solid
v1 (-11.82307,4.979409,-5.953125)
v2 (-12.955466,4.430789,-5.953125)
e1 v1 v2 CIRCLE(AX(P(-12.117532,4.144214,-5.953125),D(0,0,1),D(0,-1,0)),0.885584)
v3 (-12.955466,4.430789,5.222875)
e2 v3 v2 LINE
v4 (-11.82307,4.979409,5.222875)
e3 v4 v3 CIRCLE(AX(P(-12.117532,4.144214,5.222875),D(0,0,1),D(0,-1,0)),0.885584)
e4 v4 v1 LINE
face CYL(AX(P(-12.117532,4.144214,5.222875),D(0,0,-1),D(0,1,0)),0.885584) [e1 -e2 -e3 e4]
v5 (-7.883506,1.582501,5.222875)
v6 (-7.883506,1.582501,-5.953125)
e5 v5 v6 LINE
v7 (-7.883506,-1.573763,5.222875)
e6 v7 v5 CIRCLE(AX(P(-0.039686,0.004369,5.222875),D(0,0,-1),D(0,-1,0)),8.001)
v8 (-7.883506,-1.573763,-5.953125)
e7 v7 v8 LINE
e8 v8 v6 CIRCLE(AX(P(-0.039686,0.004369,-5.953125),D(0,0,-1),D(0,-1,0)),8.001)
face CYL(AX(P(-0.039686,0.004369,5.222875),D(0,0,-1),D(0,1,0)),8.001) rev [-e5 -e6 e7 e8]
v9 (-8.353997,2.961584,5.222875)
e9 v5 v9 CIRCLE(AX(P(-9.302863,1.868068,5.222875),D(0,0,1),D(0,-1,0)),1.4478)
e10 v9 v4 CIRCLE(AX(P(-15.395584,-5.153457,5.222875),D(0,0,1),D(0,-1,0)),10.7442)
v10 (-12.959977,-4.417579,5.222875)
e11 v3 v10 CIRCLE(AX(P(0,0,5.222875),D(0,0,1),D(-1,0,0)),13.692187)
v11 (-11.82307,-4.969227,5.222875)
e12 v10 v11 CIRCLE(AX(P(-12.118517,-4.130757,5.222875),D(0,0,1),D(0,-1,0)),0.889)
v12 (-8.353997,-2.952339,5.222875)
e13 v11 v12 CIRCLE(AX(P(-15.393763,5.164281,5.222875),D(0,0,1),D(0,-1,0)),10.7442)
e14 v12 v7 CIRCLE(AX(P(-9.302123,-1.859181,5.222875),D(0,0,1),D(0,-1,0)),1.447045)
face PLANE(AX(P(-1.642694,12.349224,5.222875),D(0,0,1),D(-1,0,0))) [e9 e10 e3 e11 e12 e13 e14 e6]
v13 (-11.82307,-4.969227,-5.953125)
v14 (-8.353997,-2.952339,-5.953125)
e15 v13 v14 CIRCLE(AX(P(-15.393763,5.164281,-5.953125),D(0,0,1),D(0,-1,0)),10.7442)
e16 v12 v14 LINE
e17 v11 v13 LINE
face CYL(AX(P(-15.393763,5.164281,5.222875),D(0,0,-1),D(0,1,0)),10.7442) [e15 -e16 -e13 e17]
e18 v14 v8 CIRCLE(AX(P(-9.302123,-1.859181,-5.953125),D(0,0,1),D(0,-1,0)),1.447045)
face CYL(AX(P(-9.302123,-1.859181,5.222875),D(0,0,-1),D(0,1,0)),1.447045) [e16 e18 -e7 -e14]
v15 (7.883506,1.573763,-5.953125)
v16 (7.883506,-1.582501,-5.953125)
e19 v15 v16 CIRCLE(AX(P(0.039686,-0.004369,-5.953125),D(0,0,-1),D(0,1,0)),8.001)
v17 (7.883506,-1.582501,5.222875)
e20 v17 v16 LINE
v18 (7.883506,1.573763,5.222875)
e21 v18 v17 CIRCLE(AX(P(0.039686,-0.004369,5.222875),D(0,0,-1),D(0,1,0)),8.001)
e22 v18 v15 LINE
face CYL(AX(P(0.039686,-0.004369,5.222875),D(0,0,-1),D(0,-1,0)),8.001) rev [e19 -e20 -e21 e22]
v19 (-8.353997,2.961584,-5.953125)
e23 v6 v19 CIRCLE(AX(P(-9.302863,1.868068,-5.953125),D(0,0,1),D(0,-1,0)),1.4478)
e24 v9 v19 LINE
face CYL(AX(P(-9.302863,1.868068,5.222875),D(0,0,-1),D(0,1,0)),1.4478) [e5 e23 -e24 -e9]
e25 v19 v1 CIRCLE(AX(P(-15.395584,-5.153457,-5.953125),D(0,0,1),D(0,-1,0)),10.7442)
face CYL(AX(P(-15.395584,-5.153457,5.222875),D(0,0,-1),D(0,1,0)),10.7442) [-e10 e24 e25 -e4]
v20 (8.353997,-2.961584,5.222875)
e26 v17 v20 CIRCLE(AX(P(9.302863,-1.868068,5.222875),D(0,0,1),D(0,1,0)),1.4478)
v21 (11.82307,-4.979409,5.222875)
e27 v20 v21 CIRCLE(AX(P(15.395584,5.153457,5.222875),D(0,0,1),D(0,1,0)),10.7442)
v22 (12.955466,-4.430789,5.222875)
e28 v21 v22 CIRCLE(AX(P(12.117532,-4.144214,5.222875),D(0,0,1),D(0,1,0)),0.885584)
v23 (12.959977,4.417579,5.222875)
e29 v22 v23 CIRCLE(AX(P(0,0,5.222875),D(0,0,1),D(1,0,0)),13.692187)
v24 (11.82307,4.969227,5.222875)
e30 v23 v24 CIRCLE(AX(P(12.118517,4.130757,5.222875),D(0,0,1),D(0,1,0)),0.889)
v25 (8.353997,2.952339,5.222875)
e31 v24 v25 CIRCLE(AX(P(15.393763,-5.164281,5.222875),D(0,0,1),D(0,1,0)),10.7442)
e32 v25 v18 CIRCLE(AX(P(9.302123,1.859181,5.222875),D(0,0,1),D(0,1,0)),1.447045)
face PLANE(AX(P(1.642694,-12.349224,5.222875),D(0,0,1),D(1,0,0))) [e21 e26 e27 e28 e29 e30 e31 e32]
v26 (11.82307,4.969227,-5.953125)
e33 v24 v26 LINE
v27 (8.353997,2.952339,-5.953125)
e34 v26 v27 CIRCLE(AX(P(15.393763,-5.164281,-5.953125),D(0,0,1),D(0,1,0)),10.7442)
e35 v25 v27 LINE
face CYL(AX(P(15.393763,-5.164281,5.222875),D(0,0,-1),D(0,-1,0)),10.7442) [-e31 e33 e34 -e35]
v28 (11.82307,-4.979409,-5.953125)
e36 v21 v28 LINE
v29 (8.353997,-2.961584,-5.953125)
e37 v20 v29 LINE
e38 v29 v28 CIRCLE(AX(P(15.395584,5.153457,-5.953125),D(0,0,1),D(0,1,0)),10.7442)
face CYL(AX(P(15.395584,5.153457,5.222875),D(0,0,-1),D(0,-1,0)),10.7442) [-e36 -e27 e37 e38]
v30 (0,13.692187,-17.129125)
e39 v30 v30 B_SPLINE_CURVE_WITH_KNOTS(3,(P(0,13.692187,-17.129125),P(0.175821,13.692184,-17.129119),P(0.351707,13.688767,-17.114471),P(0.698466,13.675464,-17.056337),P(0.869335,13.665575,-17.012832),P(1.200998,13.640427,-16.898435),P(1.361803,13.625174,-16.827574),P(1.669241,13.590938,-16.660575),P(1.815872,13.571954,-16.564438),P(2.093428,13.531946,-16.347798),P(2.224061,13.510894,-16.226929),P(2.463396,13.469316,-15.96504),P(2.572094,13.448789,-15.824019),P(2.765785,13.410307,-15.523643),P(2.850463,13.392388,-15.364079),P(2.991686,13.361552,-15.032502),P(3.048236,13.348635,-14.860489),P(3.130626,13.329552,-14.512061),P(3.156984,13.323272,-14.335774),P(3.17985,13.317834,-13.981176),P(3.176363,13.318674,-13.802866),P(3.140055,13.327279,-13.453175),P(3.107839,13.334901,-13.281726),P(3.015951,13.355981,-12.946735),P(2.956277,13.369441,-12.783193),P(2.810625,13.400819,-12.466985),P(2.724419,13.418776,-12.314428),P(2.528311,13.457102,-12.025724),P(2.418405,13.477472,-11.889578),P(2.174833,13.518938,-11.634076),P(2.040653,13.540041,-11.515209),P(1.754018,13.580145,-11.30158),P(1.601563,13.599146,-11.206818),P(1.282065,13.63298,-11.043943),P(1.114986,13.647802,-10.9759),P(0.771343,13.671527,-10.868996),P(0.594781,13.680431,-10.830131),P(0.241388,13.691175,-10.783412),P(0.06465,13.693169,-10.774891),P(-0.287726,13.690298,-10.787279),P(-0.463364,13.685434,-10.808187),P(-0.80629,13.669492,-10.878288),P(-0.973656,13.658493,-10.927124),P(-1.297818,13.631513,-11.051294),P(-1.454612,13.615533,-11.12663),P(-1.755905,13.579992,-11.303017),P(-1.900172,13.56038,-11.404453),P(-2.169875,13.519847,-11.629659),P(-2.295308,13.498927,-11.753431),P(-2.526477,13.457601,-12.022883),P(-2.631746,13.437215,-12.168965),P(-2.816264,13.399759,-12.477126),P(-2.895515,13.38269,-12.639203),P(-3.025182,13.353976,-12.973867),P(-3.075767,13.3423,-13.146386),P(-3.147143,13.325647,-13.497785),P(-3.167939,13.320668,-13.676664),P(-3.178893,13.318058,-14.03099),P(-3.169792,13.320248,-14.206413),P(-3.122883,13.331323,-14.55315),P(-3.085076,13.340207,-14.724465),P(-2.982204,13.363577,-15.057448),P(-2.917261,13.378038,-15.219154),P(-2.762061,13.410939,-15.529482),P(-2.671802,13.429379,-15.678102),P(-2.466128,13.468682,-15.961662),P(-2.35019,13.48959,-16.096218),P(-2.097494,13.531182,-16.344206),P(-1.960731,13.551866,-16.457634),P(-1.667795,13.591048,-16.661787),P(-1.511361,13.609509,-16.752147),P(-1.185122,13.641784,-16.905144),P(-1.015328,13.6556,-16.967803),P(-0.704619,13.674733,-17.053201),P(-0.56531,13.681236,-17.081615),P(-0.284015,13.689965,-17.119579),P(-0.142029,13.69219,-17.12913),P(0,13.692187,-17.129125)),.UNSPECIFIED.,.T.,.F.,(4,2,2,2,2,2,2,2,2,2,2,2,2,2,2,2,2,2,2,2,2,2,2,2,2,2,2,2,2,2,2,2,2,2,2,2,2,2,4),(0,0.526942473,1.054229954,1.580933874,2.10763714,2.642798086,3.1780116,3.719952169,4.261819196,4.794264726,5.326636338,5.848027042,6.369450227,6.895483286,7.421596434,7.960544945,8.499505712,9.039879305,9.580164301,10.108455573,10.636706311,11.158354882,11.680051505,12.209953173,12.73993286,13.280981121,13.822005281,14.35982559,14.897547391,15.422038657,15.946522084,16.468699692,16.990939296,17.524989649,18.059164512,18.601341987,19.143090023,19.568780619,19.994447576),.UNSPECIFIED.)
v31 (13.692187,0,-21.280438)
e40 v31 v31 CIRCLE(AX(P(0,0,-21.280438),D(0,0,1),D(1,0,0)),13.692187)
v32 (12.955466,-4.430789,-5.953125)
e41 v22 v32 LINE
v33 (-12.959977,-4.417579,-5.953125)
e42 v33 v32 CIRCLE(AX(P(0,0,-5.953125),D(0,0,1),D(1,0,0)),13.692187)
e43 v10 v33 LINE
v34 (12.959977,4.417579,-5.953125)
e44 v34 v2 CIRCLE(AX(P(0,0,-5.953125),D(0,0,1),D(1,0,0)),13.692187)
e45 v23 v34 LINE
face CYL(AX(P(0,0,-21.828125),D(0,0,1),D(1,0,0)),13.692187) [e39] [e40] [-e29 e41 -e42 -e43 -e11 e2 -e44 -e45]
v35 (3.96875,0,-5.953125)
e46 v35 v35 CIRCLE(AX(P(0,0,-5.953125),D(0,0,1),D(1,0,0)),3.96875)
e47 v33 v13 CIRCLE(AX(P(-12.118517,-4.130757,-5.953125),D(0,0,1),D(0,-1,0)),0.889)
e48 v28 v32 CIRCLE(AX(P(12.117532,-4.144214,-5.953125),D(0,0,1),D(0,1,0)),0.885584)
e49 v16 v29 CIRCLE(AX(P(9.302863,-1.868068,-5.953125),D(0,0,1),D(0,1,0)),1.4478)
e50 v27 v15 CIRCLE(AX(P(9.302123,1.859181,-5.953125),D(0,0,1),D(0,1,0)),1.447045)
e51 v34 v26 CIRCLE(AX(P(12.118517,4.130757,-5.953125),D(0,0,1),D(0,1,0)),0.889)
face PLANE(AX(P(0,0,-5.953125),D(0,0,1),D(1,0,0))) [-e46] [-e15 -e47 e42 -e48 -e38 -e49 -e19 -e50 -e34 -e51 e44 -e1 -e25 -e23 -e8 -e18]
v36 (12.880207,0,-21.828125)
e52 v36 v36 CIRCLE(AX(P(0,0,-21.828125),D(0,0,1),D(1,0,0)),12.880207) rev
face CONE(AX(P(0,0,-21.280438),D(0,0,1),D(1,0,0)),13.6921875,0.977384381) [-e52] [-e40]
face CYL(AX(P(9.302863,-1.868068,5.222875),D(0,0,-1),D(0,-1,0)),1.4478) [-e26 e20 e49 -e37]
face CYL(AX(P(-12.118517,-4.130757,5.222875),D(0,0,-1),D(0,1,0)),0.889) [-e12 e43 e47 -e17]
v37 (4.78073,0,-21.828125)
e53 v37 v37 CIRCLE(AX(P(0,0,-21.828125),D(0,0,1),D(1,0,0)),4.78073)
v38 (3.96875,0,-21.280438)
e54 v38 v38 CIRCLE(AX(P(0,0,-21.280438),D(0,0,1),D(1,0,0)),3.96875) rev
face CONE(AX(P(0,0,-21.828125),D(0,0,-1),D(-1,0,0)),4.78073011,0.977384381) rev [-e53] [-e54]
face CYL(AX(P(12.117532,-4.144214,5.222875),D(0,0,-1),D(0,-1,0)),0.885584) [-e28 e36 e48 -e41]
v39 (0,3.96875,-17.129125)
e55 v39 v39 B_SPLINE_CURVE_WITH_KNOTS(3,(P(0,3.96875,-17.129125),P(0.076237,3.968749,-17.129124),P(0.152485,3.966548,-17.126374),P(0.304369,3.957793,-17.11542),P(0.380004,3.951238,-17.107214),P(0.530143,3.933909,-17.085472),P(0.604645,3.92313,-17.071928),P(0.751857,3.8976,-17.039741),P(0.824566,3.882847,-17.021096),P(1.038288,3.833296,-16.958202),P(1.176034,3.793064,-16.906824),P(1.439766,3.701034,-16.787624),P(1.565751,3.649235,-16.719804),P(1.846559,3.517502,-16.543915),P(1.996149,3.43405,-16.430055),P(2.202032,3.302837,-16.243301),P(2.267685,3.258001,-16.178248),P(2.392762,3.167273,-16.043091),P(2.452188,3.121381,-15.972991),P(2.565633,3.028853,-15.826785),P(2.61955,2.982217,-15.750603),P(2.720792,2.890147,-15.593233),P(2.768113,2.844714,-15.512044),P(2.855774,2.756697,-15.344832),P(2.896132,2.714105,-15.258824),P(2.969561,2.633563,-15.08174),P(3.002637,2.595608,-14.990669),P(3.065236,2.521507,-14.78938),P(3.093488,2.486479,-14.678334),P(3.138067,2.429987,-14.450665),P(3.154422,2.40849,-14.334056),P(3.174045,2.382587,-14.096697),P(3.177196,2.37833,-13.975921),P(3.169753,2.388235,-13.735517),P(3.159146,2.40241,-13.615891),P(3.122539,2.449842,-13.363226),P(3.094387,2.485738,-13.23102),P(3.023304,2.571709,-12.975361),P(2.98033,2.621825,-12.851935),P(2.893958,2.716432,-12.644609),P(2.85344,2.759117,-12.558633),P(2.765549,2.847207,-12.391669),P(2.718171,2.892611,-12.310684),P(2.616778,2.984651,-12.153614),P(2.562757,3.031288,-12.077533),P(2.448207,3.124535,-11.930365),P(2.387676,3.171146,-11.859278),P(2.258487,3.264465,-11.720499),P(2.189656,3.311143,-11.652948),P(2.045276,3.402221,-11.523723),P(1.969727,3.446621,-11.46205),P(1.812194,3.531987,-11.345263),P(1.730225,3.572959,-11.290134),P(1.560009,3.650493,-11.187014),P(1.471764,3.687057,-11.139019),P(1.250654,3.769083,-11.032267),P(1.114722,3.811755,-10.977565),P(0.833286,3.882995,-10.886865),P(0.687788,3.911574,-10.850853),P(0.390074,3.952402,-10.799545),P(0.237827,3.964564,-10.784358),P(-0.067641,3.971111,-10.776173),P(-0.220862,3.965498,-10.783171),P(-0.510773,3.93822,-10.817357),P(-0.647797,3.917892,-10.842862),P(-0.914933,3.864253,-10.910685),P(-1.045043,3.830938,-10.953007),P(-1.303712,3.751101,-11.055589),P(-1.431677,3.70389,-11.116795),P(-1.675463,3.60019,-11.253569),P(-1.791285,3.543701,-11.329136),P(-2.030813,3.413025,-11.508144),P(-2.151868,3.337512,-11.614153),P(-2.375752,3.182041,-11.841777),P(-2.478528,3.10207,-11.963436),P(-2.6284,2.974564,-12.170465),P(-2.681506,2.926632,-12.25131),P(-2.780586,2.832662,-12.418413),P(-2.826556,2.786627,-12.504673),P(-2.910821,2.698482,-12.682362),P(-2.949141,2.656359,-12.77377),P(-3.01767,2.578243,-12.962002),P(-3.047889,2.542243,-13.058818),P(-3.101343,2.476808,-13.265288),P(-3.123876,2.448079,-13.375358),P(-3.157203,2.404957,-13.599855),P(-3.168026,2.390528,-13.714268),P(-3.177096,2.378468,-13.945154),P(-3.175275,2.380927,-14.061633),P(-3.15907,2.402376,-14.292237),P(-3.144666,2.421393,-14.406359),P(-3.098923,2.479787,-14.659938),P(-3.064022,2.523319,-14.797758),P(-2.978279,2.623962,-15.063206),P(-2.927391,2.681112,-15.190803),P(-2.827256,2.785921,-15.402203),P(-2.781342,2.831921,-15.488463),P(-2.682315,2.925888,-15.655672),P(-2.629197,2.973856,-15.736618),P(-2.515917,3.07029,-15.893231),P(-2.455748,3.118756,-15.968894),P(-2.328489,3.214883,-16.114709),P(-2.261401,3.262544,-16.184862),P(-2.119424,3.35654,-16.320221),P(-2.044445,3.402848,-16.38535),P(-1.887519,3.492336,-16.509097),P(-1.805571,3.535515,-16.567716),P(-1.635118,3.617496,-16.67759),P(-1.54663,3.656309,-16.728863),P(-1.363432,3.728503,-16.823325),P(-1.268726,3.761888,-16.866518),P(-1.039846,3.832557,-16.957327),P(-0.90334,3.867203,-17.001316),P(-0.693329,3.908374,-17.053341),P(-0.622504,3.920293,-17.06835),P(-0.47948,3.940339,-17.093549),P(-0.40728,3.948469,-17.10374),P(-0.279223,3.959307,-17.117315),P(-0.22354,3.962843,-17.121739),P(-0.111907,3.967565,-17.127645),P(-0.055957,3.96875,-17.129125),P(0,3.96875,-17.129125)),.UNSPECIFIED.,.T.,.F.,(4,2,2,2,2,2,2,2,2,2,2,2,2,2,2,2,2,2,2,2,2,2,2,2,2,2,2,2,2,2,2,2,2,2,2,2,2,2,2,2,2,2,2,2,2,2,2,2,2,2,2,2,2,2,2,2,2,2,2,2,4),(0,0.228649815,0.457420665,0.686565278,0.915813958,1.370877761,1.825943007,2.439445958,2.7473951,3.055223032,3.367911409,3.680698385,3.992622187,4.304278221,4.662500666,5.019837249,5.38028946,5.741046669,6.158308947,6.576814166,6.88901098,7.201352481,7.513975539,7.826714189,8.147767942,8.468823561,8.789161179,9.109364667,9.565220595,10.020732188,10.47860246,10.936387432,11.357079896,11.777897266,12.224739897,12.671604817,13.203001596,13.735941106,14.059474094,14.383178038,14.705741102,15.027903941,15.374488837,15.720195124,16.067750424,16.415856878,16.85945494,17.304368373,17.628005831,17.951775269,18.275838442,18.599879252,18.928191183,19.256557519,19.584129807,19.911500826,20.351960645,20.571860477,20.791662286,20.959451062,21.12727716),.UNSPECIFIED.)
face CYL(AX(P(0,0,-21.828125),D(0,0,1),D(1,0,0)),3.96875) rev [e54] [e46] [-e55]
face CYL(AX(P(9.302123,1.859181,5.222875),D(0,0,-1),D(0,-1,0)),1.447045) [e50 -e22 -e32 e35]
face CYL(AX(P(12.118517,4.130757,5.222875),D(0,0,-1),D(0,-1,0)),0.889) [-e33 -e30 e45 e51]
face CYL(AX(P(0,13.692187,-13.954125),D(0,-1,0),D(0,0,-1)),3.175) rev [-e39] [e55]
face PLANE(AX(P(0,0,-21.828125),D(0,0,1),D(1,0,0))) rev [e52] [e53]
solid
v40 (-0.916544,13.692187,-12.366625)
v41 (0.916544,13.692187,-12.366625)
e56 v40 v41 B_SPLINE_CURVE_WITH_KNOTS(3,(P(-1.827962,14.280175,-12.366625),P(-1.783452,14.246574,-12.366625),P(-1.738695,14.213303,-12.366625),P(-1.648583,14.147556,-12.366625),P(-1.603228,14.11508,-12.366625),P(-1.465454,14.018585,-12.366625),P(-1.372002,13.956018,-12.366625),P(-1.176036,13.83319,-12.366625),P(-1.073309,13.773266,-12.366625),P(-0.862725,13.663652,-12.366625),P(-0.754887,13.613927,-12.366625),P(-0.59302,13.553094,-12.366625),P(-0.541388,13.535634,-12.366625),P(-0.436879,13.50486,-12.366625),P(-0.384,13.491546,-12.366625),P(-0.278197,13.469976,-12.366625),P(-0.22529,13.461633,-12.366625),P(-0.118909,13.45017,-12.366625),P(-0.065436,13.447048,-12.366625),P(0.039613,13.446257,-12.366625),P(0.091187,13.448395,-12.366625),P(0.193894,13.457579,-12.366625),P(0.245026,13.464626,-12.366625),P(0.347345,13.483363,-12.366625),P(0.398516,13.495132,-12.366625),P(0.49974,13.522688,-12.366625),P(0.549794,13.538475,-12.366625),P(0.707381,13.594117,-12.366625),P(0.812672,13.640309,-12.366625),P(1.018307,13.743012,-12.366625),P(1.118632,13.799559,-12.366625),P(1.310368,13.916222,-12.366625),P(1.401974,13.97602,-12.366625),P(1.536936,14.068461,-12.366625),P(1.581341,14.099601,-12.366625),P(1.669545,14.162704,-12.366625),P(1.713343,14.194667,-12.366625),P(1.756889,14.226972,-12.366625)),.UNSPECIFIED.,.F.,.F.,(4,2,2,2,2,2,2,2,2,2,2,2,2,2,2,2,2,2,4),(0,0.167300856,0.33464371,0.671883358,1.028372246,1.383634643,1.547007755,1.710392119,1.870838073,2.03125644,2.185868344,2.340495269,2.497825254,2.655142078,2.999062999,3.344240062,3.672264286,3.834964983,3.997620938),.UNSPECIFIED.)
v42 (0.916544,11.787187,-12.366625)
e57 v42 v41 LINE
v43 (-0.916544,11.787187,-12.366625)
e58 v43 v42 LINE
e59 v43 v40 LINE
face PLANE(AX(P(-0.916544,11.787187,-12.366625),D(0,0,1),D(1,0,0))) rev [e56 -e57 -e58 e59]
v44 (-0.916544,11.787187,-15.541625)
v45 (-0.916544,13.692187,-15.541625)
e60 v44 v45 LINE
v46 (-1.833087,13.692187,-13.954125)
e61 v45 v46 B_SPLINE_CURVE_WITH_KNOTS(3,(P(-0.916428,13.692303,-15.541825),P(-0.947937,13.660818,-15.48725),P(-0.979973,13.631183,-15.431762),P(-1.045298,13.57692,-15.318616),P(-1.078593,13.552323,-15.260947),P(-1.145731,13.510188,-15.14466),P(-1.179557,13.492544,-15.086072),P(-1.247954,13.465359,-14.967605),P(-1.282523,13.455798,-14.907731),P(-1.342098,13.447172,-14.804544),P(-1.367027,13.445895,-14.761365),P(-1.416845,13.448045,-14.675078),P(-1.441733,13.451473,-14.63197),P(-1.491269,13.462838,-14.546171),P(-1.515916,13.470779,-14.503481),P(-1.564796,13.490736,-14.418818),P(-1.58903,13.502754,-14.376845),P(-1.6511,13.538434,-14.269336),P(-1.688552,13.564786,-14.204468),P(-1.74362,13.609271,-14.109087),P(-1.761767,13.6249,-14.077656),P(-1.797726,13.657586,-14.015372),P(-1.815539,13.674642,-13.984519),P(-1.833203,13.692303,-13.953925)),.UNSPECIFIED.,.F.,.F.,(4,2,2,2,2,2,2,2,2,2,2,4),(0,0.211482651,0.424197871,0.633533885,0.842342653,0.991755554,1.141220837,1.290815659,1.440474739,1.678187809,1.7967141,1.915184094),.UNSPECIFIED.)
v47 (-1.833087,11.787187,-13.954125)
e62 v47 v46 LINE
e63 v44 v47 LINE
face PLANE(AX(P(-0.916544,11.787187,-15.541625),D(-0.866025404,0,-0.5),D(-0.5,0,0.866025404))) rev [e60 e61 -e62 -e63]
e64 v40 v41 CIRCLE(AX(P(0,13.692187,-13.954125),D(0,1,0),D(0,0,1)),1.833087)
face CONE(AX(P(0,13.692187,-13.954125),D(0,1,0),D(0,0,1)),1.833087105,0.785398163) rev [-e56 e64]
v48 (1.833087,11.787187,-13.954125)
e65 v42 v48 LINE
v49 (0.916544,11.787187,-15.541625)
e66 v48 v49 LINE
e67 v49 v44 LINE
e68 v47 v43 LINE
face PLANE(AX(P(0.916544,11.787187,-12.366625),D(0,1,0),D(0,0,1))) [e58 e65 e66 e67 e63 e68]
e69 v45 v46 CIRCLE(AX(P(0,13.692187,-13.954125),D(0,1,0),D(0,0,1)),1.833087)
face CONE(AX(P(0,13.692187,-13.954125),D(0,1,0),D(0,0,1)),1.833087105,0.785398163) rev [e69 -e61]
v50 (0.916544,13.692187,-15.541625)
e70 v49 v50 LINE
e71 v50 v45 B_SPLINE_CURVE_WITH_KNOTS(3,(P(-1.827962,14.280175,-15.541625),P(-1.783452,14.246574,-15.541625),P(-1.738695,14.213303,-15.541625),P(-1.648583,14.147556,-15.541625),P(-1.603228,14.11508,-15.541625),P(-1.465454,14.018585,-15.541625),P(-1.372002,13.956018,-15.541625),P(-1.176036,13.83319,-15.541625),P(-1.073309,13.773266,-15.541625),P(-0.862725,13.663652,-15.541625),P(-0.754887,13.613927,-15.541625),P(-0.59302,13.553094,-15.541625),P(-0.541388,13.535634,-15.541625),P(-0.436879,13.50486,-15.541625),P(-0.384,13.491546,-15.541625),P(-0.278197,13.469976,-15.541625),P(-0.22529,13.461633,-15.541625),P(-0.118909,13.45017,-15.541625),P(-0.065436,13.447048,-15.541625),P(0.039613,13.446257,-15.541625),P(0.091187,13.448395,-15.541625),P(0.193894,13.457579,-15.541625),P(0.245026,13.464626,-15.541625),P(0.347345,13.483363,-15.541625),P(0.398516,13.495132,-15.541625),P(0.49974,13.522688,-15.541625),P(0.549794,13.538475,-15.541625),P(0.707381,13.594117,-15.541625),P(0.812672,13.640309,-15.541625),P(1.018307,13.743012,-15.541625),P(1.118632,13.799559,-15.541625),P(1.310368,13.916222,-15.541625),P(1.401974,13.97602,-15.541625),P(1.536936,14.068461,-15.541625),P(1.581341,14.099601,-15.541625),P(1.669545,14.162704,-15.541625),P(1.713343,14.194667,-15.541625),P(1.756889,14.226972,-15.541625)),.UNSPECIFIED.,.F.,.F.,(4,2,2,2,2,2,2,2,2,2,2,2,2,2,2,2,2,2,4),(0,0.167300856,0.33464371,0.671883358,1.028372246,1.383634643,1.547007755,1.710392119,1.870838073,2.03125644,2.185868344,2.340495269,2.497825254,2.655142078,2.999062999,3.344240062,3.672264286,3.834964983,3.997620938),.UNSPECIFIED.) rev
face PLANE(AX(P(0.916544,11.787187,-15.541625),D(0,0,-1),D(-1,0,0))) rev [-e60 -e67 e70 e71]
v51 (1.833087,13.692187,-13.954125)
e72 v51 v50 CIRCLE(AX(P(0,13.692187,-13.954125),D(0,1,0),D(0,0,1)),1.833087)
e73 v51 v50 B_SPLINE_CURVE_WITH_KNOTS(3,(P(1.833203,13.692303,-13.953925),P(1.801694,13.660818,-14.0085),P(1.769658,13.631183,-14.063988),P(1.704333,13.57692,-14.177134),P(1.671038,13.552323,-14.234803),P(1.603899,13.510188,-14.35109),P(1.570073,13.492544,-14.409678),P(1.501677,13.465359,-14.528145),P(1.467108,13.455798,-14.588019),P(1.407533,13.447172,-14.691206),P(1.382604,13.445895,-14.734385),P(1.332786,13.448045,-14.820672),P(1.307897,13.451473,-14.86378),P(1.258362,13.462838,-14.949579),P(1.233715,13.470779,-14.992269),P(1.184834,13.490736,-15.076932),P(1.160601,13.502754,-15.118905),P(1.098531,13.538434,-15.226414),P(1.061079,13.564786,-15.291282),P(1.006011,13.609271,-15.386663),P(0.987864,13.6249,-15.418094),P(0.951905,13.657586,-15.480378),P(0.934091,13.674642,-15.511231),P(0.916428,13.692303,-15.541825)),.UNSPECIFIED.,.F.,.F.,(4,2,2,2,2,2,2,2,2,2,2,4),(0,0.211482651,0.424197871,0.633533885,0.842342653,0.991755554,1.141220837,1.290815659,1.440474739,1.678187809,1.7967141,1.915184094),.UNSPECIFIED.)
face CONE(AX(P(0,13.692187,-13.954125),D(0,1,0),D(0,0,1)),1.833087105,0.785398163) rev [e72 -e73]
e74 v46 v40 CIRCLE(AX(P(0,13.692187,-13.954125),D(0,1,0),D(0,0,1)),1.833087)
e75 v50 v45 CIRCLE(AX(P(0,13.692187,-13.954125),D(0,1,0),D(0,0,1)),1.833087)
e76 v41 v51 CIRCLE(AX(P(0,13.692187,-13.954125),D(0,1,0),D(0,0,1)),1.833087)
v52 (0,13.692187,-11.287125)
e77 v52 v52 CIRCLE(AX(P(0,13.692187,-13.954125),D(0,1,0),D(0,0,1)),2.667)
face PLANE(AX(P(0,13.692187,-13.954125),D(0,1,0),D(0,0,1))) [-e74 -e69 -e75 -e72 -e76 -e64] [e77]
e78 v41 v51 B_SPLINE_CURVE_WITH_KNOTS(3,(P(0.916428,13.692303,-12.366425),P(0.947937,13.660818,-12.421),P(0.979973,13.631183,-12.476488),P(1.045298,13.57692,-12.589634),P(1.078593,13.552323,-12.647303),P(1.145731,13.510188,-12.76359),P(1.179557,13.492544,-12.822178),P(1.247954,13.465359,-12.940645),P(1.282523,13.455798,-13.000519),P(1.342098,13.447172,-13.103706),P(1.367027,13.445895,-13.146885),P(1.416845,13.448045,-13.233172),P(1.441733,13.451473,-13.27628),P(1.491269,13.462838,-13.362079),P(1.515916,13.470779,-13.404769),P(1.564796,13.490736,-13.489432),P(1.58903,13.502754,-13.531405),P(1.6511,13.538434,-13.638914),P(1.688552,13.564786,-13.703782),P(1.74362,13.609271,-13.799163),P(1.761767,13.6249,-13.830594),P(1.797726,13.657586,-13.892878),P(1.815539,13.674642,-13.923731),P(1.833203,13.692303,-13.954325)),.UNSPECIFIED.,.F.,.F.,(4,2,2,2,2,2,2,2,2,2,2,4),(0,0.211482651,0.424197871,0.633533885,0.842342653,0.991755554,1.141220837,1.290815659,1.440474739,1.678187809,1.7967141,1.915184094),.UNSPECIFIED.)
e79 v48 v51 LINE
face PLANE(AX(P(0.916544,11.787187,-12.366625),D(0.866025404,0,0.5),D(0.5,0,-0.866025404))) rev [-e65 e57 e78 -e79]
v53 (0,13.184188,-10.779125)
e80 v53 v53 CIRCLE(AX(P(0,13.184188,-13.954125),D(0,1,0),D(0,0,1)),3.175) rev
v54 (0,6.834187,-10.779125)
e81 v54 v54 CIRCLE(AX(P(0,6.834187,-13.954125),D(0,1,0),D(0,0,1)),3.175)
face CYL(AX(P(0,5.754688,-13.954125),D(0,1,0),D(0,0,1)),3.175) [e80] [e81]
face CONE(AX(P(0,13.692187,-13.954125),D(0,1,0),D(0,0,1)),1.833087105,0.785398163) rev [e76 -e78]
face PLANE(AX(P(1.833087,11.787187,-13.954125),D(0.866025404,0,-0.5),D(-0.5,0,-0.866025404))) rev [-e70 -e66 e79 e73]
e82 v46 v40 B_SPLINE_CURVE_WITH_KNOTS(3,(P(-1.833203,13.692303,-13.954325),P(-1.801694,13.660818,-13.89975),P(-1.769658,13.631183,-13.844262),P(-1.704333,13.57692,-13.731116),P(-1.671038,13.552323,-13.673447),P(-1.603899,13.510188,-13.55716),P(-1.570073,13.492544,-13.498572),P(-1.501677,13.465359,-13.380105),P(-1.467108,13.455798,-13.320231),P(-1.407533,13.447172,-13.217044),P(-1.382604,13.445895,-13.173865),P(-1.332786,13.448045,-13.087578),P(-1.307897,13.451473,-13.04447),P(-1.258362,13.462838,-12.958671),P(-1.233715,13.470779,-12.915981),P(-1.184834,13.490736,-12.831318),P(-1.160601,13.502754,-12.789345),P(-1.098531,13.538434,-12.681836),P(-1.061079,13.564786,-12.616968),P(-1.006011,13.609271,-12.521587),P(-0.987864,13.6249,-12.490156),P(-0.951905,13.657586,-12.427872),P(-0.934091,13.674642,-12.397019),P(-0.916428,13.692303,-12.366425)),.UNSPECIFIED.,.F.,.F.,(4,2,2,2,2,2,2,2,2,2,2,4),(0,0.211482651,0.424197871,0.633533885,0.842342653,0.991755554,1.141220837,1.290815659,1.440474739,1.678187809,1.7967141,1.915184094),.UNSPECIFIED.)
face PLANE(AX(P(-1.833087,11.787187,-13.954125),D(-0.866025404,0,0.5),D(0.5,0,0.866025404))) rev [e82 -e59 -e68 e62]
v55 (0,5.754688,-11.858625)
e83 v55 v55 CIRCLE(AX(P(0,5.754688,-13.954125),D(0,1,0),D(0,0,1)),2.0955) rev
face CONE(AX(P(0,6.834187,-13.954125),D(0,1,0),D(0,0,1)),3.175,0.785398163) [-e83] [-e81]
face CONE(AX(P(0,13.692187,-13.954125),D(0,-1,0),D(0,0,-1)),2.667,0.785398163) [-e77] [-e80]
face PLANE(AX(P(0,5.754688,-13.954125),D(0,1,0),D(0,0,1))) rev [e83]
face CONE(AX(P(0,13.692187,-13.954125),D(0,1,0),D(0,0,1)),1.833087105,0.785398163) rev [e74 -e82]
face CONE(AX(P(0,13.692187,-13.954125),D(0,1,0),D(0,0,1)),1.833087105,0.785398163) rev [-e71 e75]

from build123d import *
from OCP.BRepFilletAPI import BRepFilletAPI_MakeChamfer

# Parameters (mm, degrees)
BOSS_EXTRUDE1_START     = -5.953125
SKETCH1_R               = 13.6921875
BOSS_EXTRUDE1_DEPTH     = 15.875
BOSS_EXTRUDE5_START     = 11.176
BOSS_EXTRUDE5_DEPTH     = 11.176
MOVE_START              = -5.953125
MOVE_FACE1_DEPTH        = 11.176
MOVE_FACE1_2_DEPTH      = 11.176
CIRPATTERN3_START       = -5.953125
CIRPATTERN3_DEPTH       = 11.176
CUT_EXTRUDE5_DEPTH      = 30.179085628
CUT_EXTRUDE5_DEPTH_BACK = 30.179085628
SKETCH15_R              = 3.96875
CHAMFER1_SIZE           = 0.5476875
CHAMFER1_SIZE2          = 0.81198011
SKETCH5_R               = 3.175
CUT_EXTRUDE2_DEPTH      = 30.179085628
SKETCH6_R               = 3.175
BOSS_EXTRUDE3_DEPTH     = 7.9375
CUT_EXTRUDE3_DEPTH      = 1.905
CHAMFER3_SIZE           = 0.508
CHAMFER4_SIZE           = 1.0795


# Read off the part's stored shape, not the designer's step: Move Face1, CirPattern3
with BuildPart() as part:
    # Sketch1 → Boss-Extrude1 (new body)
    with BuildSketch(Plane.XY.offset(BOSS_EXTRUDE1_START)):
        Circle(SKETCH1_R)
    extrude(amount=-BOSS_EXTRUDE1_DEPTH)

    # Sketch11 → Boss-Extrude5 (add)
    with BuildSketch(Plane.XY.offset(-5.953125).offset(BOSS_EXTRUDE5_START)):
        with BuildLine():
            ThreePointArc((-1.582501, -7.883505579), (-0.004369034, -8.040686324), (1.573762932, -7.883505579))
            ThreePointArc((1.573762932, -7.883505579), (2.326569083, -7.932638836), (2.952339417, -8.353996958))
            ThreePointArc((2.952339417, -8.353996958), (4.124174772, -9.993538922), (4.969226713, -11.823069782))
            ThreePointArc((4.969226713, -11.823069782), (4.930575443, -12.50660364), (4.417578974, -12.959976641))
            ThreePointArc((4.417578974, -12.959976641), (-0.006979455, -13.692185721), (-4.430789112, -12.955466274))
            ThreePointArc((-4.430789112, -12.955466274), (-4.941191352, -12.503649266), (-4.979409431, -11.823069782))
            ThreePointArc((-4.979409431, -11.823069782), (-4.13390788, -9.993483356), (-2.961583815, -8.353996958))
            ThreePointArc((-2.961583815, -8.353996958), (-2.335546152, -7.932611995), (-1.582501, -7.883505579))
        make_face()
    extrude(amount=-BOSS_EXTRUDE5_DEPTH)

    # Move Face1 outline → Move Face1 (cut)
    with BuildSketch(Plane.XY.offset(MOVE_START)):
        with BuildLine():
            ThreePointArc((-4.430789112, -12.955466274), (-0.006979455, -13.692185721), (4.417578974, -12.959976641))
            ThreePointArc((4.417578974, -12.959976641), (4.930575443, -12.50660364), (4.969226713, -11.823069782))
            ThreePointArc((4.969226713, -11.823069782), (4.124174772, -9.993538922), (2.952339417, -8.353996958))
            ThreePointArc((2.952339417, -8.353996958), (2.326569083, -7.932638836), (1.573762932, -7.883505579))
            ThreePointArc((1.573762932, -7.883505579), (-0.004369034, -8.040686324), (-1.582501, -7.883505579))
            ThreePointArc((-1.582501, -7.883505579), (-2.335546152, -7.932611995), (-2.961583815, -8.353996958))
            ThreePointArc((-2.961583815, -8.353996958), (-4.13390788, -9.993483356), (-4.979409431, -11.823069782))
            ThreePointArc((-4.979409431, -11.823069782), (-4.941191352, -12.503649266), (-4.430789112, -12.955466274))
        make_face()
    extrude(amount=MOVE_FACE1_DEPTH, mode=Mode.SUBTRACT)

    # Move Face1 2 outline → Move Face1 2 (add)
    with BuildSketch(Plane.XY.offset(MOVE_START)):
        with BuildLine():
            ThreePointArc((7.883505579, -1.582501), (7.932611995, -2.335546152), (8.353996958, -2.961583815))
            ThreePointArc((8.353996958, -2.961583815), (9.993483356, -4.13390788), (11.823069782, -4.979409431))
            ThreePointArc((11.823069782, -4.979409431), (12.503649266, -4.941191352), (12.955466274, -4.430789112))
            ThreePointArc((12.955466274, -4.430789112), (13.692185721, -0.006979455), (12.959976641, 4.417578974))
            ThreePointArc((12.959976641, 4.417578974), (12.50660364, 4.930575443), (11.823069782, 4.969226713))
            ThreePointArc((11.823069782, 4.969226713), (9.993538922, 4.124174772), (8.353996958, 2.952339417))
            ThreePointArc((8.353996958, 2.952339417), (7.932638836, 2.326569083), (7.883505579, 1.573762932))
            ThreePointArc((7.883505579, 1.573762932), (8.040686324, -0.004369034), (7.883505579, -1.582501))
        make_face()
    extrude(amount=MOVE_FACE1_2_DEPTH)

    # CirPattern3 outline → CirPattern3 (add)
    with BuildSketch(Plane.XY.offset(CIRPATTERN3_START)):
        with BuildLine():
            ThreePointArc((-7.883505579, 1.582501), (-7.932611995, 2.335546152), (-8.353996958, 2.961583815))
            ThreePointArc((-8.353996958, 2.961583815), (-9.993483356, 4.13390788), (-11.823069782, 4.979409431))
            ThreePointArc((-11.823069782, 4.979409431), (-12.503649266, 4.941191352), (-12.955466274, 4.430789112))
            ThreePointArc((-12.955466274, 4.430789112), (-13.692185721, 0.006979455), (-12.959976641, -4.417578974))
            ThreePointArc((-12.959976641, -4.417578974), (-12.50660364, -4.930575443), (-11.823069782, -4.969226713))
            ThreePointArc((-11.823069782, -4.969226713), (-9.993538922, -4.124174772), (-8.353996958, -2.952339417))
            ThreePointArc((-8.353996958, -2.952339417), (-7.932638836, -2.326569083), (-7.883505579, -1.573762932))
            ThreePointArc((-7.883505579, -1.573762932), (-8.040686324, 0.004369034), (-7.883505579, 1.582501))
        make_face()
    extrude(amount=CIRPATTERN3_DEPTH)

    # Sketch15 → Cut-Extrude5 (cut, two sides: drawn at the far end of the back side and taken through both)
    with BuildSketch(Plane.XY.offset(-CUT_EXTRUDE5_DEPTH_BACK)):
        Circle(SKETCH15_R)
    extrude(amount=CUT_EXTRUDE5_DEPTH + CUT_EXTRUDE5_DEPTH_BACK, mode=Mode.SUBTRACT)

    # Chamfer1: one chamfer whose edges measure the first distance from different faces: ONE call of the kernel's chamfer builder (chamfer() names one face for all edges)
    chamfer1_edges_1 = [part.edges().sort_by_distance(p)[0] for p in [
        (-13.6921875, 0, -21.828125),
    ]]
    chamfer1_side_1 = [part.faces().sort_by_distance(p)[0] for p in [
        (-13.6921875, 0, -13.890625),
    ]]
    chamfer1_edges_2 = [part.edges().sort_by_distance(p)[0] for p in [
        (-3.96875, 0, -21.828125),
    ]]
    chamfer1_side_2 = [part.faces().sort_by_distance(p)[0] for p in [
        (-3.96875, 0, -13.890625),
    ]]
    chamfer1 = BRepFilletAPI_MakeChamfer(part.part.solid().wrapped)
    for e in chamfer1_edges_1:
        chamfer1.Add(CHAMFER1_SIZE, CHAMFER1_SIZE2, e.wrapped, chamfer1_side_1[0].wrapped)  # the first distance lies on this face
    for e in chamfer1_edges_2:
        chamfer1.Add(CHAMFER1_SIZE, CHAMFER1_SIZE2, e.wrapped, chamfer1_side_2[0].wrapped)  # the first distance lies on this face
    add(Compound.cast(chamfer1.Shape()), mode=Mode.REPLACE)

    # Sketch5 → Cut-Extrude2 (cut, through all)
    with BuildSketch(Plane(origin=(0, 0, 0), x_dir=(1, 0, 0), z_dir=(0, 1, 0))):
        with Locations(Location((0, 13.954125, 0), (0, 0, 90))):
            Circle(SKETCH5_R)
    extrude(amount=CUT_EXTRUDE2_DEPTH, mode=Mode.SUBTRACT)


with BuildPart() as body_2:
    # Sketch6 → Boss-Extrude3 (new body)
    with BuildSketch(Plane(origin=(0, 13.6921875, 0), x_dir=(-1, 0, 0), z_dir=(0, 1, 0))):
        with Locations(Location((0, -13.954125, 0), (0, 0, 90))):
            Circle(SKETCH6_R)
    extrude(amount=-BOSS_EXTRUDE3_DEPTH)

    # Sketch8 → Cut-Extrude3 (cut)
    with BuildSketch(Plane(origin=(0, 13.6921875, 0), x_dir=(1, 0, 0), z_dir=(0, 1, 0))):
        Polygon((0.916543552, 12.366625), (1.833087105, 13.954125), (0.916543552, 15.541625), (-0.916543552, 15.541625), (-1.833087105, 13.954125), (-0.916543552, 12.366625), align=None)
    extrude(amount=-CUT_EXTRUDE3_DEPTH, mode=Mode.SUBTRACT)

    # Cut-Extrude4 cone 1 section (through the dimple's axis) → Cut-Extrude4 (revolve, cut)
    with BuildSketch(Plane(origin=(0, 13.6921875, -13.954125), x_dir=(0, 0, 1), z_dir=(1, 0, 0))):
        Polygon((0, 0), (1.833087105, 0), (0, 1.833087105), align=None)
    revolve(axis=Axis((0, 13.6921875, -13.954125), (0, -1, 0)), mode=Mode.SUBTRACT)

    # Chamfer3
    chamfer3_edges = [body_2.edges().sort_by_distance(p)[0] for p in [
        (0, 13.6921875, -17.129125),
    ]]
    chamfer(chamfer3_edges, length=CHAMFER3_SIZE)

    # Chamfer4
    chamfer4_edges = [body_2.edges().sort_by_distance(p)[0] for p in [
        (0, 5.7546875, -17.129125),
    ]]
    chamfer(chamfer4_edges, length=CHAMFER4_SIZE)


solid = Compound([part.part, body_2.part])
